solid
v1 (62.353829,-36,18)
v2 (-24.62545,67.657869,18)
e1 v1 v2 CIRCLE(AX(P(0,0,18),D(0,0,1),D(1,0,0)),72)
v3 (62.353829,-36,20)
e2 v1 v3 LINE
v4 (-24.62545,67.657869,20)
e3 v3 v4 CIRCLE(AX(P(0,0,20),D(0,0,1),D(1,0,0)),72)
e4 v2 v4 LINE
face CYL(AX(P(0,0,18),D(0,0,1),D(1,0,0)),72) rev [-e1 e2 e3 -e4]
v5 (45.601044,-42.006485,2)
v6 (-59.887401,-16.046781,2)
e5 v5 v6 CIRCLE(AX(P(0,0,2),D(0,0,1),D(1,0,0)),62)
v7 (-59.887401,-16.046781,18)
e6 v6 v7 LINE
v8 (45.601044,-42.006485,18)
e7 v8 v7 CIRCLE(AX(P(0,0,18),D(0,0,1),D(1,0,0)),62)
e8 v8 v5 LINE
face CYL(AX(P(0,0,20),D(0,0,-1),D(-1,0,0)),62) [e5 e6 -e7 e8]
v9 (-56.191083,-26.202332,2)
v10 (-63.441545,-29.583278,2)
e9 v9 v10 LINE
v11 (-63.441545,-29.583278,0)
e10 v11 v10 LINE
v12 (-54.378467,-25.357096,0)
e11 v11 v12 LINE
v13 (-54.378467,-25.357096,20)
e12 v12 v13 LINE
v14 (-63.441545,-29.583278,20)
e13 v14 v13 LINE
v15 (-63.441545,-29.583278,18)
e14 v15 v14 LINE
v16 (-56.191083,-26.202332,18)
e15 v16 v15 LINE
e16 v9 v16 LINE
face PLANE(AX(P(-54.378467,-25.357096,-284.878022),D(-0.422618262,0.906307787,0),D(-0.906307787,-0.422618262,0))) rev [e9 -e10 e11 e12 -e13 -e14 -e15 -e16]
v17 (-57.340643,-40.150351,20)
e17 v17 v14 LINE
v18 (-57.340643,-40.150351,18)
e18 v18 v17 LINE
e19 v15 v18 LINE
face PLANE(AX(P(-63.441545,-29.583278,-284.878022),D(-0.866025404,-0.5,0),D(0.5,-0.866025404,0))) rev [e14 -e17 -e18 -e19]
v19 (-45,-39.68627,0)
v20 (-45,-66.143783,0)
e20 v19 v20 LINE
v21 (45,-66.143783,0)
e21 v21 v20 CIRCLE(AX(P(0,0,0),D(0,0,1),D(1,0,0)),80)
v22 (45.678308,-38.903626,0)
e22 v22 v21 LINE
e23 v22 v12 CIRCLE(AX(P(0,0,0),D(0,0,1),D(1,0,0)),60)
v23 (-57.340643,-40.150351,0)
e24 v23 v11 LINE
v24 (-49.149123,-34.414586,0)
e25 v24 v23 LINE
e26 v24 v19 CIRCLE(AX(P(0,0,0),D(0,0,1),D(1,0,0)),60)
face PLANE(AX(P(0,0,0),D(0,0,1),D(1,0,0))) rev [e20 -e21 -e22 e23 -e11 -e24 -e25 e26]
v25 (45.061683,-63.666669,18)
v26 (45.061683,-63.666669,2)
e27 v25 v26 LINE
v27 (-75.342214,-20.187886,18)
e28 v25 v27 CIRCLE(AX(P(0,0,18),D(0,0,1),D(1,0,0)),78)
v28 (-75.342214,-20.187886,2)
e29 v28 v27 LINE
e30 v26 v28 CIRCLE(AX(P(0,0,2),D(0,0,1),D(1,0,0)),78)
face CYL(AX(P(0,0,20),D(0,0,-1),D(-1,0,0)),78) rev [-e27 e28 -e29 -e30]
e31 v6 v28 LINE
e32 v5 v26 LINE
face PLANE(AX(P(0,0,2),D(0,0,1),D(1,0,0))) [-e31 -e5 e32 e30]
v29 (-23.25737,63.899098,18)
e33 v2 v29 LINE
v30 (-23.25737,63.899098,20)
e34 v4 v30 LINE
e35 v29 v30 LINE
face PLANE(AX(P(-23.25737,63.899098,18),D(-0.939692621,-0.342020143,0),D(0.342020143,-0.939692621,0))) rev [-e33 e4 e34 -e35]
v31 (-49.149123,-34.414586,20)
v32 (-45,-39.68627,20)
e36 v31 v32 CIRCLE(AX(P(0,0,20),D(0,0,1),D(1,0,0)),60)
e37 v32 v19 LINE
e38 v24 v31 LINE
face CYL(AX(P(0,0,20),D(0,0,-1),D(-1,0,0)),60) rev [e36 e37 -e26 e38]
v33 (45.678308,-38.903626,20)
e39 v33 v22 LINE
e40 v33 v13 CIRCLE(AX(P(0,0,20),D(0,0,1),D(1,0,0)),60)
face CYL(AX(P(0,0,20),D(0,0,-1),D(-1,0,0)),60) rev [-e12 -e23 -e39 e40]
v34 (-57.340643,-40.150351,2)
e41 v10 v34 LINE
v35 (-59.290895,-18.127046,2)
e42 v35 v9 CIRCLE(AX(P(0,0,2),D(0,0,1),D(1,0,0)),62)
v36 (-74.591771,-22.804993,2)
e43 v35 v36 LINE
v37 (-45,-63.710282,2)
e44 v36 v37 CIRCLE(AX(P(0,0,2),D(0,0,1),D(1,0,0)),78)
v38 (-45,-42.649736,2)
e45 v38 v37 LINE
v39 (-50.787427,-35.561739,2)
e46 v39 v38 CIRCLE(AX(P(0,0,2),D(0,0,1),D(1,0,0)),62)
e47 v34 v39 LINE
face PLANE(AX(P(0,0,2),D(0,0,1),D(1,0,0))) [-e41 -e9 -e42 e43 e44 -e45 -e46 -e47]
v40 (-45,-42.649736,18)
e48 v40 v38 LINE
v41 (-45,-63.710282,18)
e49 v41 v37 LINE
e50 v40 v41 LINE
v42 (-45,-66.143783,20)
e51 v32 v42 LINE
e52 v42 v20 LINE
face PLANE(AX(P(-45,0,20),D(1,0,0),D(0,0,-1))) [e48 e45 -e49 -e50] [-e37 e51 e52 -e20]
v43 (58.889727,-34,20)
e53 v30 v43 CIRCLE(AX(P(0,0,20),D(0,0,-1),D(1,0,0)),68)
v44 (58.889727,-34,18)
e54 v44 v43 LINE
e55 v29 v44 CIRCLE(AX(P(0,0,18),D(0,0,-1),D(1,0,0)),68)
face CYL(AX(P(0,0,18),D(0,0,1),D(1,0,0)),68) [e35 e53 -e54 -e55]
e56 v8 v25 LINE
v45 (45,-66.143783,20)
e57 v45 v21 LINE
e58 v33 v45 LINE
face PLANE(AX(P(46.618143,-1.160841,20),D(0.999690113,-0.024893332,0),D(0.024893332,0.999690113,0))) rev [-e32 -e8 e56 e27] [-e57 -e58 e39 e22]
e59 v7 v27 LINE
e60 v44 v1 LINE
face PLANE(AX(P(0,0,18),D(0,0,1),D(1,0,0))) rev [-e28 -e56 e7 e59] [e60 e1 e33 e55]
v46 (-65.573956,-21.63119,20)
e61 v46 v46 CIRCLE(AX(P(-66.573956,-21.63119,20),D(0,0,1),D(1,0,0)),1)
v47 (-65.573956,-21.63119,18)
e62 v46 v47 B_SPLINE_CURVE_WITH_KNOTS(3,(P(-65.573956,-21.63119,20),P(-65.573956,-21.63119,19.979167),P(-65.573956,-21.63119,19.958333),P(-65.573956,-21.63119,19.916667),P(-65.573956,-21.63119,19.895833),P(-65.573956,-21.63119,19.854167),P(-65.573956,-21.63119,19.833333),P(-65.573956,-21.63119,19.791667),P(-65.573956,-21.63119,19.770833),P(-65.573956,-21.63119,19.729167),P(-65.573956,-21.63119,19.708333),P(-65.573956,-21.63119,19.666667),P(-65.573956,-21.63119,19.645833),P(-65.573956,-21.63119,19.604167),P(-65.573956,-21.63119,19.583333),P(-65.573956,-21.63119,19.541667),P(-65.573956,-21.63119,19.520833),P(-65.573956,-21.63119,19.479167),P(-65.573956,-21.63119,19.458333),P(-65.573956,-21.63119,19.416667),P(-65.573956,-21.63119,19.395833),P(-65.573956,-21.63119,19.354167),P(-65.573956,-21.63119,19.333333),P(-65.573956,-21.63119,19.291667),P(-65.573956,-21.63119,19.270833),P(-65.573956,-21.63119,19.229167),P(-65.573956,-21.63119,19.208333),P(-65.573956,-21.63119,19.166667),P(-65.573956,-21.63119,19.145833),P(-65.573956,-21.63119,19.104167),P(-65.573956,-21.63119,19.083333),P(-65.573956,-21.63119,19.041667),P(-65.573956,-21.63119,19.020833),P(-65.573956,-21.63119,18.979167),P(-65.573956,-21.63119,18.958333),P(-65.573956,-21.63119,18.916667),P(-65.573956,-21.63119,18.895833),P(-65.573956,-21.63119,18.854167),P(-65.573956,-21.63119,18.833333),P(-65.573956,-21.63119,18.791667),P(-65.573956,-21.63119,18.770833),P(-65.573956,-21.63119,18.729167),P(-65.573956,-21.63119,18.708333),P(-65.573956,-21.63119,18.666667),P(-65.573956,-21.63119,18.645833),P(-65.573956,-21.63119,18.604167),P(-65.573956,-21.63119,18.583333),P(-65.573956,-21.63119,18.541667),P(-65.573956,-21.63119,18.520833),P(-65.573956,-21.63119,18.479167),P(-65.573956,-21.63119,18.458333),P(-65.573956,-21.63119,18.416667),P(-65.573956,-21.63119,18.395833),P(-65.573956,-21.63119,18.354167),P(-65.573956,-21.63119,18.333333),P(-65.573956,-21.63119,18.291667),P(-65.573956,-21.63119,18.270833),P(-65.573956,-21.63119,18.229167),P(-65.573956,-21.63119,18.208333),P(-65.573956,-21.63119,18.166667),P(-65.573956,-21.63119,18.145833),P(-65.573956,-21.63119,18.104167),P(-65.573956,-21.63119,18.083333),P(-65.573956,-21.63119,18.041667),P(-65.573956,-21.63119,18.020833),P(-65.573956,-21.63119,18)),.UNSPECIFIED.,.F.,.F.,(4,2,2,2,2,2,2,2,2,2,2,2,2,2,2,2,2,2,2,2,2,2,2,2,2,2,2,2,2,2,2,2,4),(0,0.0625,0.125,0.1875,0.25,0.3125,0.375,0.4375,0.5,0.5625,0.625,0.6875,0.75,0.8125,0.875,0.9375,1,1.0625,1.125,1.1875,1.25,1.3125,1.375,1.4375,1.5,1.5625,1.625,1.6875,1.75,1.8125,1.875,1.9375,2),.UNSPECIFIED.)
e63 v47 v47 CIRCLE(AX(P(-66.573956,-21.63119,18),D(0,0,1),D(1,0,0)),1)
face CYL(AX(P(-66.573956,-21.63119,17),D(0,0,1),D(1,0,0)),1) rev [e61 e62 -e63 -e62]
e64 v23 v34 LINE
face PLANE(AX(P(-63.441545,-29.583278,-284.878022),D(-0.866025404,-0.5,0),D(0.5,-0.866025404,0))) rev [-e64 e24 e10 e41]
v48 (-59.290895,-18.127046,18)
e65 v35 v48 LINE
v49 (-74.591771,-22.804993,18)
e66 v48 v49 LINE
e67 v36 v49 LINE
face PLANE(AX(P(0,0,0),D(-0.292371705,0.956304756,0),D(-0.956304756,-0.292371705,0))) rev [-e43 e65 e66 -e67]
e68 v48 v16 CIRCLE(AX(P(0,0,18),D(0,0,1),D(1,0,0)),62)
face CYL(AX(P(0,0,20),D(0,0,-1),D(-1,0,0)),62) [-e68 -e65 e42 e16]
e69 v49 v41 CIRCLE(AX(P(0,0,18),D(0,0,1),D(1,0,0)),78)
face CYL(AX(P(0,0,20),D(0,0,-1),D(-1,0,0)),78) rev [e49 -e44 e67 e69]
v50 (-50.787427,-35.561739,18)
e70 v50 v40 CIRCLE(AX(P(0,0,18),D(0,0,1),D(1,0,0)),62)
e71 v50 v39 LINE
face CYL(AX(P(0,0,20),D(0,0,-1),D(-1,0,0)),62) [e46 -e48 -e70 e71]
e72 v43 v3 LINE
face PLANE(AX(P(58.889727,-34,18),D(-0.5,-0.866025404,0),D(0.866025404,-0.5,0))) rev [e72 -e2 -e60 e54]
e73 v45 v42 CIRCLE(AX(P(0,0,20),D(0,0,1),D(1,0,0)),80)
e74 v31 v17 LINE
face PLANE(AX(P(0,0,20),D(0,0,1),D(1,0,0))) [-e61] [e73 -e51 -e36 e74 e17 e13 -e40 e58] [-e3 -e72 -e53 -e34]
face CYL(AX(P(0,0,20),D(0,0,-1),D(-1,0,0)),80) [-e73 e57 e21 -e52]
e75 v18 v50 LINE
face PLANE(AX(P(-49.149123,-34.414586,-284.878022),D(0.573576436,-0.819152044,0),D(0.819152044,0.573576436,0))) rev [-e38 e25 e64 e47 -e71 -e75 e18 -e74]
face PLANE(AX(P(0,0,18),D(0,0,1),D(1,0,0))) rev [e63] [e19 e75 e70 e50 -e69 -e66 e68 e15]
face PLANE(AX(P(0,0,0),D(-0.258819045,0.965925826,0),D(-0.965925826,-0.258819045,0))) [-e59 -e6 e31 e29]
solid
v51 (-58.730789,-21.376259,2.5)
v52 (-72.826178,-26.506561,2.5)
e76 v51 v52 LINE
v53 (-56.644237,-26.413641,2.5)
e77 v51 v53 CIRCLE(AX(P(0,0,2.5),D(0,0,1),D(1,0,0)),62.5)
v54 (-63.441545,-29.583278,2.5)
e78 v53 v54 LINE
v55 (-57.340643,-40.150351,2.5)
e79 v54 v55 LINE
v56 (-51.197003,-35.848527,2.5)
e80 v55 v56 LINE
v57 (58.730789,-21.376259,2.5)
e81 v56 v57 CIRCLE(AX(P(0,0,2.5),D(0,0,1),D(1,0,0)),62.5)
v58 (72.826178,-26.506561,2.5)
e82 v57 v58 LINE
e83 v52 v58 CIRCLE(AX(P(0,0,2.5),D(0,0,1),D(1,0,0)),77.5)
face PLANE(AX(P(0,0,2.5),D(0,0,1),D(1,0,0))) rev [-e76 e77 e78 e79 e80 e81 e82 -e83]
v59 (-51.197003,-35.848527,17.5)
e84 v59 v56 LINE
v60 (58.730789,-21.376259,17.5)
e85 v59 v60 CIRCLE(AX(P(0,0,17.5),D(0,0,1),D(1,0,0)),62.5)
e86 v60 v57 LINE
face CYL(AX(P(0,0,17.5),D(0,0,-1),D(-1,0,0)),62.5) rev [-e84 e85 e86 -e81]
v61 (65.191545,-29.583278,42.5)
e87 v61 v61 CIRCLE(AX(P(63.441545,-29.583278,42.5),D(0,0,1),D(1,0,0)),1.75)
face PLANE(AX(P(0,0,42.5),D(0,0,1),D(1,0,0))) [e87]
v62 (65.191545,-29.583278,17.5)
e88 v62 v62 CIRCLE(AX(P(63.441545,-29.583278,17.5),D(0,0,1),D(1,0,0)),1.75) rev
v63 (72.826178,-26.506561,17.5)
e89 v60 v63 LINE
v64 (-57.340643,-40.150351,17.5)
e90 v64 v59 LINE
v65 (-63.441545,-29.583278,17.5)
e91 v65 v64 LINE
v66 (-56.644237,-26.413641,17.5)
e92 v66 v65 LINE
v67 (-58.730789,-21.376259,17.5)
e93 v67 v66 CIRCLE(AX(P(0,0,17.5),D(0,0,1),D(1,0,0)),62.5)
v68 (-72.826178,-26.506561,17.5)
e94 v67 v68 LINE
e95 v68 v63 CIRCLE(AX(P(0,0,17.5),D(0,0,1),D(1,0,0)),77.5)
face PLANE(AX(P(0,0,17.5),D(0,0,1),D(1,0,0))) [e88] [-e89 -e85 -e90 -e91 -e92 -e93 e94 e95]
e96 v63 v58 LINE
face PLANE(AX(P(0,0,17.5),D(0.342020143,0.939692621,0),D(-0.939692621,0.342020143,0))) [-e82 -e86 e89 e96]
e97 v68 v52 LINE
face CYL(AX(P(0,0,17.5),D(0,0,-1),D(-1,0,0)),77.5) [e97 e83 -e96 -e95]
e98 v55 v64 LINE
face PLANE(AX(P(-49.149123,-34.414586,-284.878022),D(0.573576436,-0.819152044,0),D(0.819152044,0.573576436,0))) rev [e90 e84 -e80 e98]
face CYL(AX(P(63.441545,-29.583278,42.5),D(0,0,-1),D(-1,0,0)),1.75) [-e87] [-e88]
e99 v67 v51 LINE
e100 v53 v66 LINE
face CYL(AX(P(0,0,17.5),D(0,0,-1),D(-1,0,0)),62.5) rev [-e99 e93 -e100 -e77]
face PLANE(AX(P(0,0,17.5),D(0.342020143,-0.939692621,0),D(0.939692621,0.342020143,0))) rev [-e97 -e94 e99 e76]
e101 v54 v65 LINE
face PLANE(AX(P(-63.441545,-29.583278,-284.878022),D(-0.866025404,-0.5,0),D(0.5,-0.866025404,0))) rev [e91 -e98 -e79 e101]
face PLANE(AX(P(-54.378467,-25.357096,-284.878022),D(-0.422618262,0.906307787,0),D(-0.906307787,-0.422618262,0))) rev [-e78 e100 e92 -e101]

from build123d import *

# Parameters (mm, degrees)
BOSS_EXTRUDE7_DEPTH  = 20
SHELL3_T             = -2
CUT_EXTRUDE4_DEPTH   = 2
SKETCH17_R           = 1
CUT_EXTRUDE5_DEPTH   = 3
BOSS_EXTRUDE11_START = -20
BOSS_EXTRUDE11_DEPTH = 20
BOSS_EXTRUDE12_START = 2.5
BOSS_EXTRUDE12_DEPTH = 15
CUT_EXTRUDE6_START   = -20
CUT_EXTRUDE6_DEPTH   = 20
BOSS_EXTRUDE14_START = 2.5
BOSS_EXTRUDE14_DEPTH = 40


# Read off the part's stored shape, not the designer's step: Cut-Extrude6
with BuildPart() as part:
    # Sketch12 → Boss-Extrude7 (new body)
    with BuildSketch(Plane.XY):
        with BuildLine():
            Line((-45, -66.143782777), (-45, -39.686269666))
            ThreePointArc((-45, -39.686269666), (-0.517840004, 59.997765306), (45.678308464, -38.903626256))
            Line((45.678308464, -38.903626256), (45, -66.143782777))
            ThreePointArc((45, -66.143782777), (0, 80), (-45, -66.143782777))
        make_face()
    extrude(amount=BOSS_EXTRUDE7_DEPTH)

    # Shell3
    shell3_openings = [part.faces().sort_by_distance(p)[0] for p in [
        (45.339154232, -52.523704516, 10),
        (-45, -52.915026221, 10),
    ]]
    offset(amount=SHELL3_T, openings=shell3_openings, kind=Kind.INTERSECTION)

    # Sketch15 → Cut-Extrude4 (cut)
    with BuildSketch(Plane.XY.offset(20)):
        with BuildLine():
            Line((58.889727457, -34), (62.353829072, -36))
            ThreePointArc((62.353829072, -36), (55.155199905, 46.280707897), (-24.625450319, 67.657868697))
            Line((-24.625450319, 67.657868697), (-23.257369746, 63.899098213))
            ThreePointArc((-23.257369746, 63.899098213), (52.091022132, 43.709557459), (58.889727457, -34))
        make_face()
    extrude(amount=-CUT_EXTRUDE4_DEPTH, mode=Mode.SUBTRACT)

    # Sketch17 → Cut-Extrude5 (cut)
    with BuildSketch(Plane.XY.offset(20)):
        with Locations((-66.573956141, -21.631189606)):
            Circle(SKETCH17_R)
    extrude(amount=-CUT_EXTRUDE5_DEPTH, mode=Mode.SUBTRACT)

    # Sketch17<4> → Boss-Extrude11 (add)
    with BuildSketch(Plane.XY.offset(20).offset(BOSS_EXTRUDE11_START)):
        with BuildLine():
            Line((-76.504380477, -23.389736378), (-57.378285358, -17.542302283))
            ThreePointArc((-57.378285358, -17.542302283), (-57.675701756, -16.538241349), (-57.955549577, -15.529142706))
            Line((-57.955549577, -15.529142706), (-77.274066103, -20.705523608))
            ThreePointArc((-77.274066103, -20.705523608), (-76.900935675, -22.050988465), (-76.504380477, -23.389736378))
        make_face()
    extrude(amount=BOSS_EXTRUDE11_DEPTH)


with BuildPart() as body_2:
    # Sketch19 → Boss-Extrude12 (new body)
    with BuildSketch(Plane.XY.offset(BOSS_EXTRUDE12_START)):
        with BuildLine():
            Line((-58.730788799, -21.376258958), (-72.826178111, -26.506561108))
            ThreePointArc((-72.826178111, -26.506561108), (0, -77.5), (72.826178111, -26.506561108))
            Line((72.826178111, -26.506561108), (58.730788799, -21.376258958))
            ThreePointArc((58.730788799, -21.376258958), (0, -62.5), (-58.730788799, -21.376258958))
        make_face()
    extrude(amount=BOSS_EXTRUDE12_DEPTH)


with BuildPart() as cut_extrude6_tool:
    # Cut-Extrude6 outline → Cut-Extrude6 (new body)
    with BuildSketch(Plane(origin=(0, 0, 0), x_dir=(-1, 0, 0), z_dir=(0, 0, -1)).offset(CUT_EXTRUDE6_START)):
        with BuildLine():
            Line((51.197002768, -35.848527272), (57.3406431, -40.150350545))
            Line((57.3406431, -40.150350545), (63.441545093, -29.583278322))
            Line((63.441545093, -29.583278322), (56.64423669, -26.413641359))
            Line((56.64423669, -26.413641359), (54.378467222, -25.357095704))
            ThreePointArc((54.378467222, -25.357095704), (51.961524227, -30), (49.149122657, -34.414586181))
            Line((49.149122657, -34.414586181), (51.197002768, -35.848527272))
        make_face()
    extrude(amount=CUT_EXTRUDE6_DEPTH)


with BuildPart() as part_1:
    add(part.part)

    # Cut-Extrude6: cut by cut_extrude6_tool
    add(cut_extrude6_tool.part, mode=Mode.SUBTRACT)


with BuildPart() as body_2_1:
    add(body_2.part)

    # Cut-Extrude6: cut by cut_extrude6_tool
    add(cut_extrude6_tool.part, mode=Mode.SUBTRACT)

    # Sketch19<5> → Boss-Extrude14 (add)
    with BuildSketch(Plane.XY.offset(BOSS_EXTRUDE14_START)):
        with BuildLine():
            ThreePointArc((65.191545093, -29.583278322), (63.820314417, -27.874760309), (61.855506465, -28.843696364))
            Line((61.855506465, -28.843696364), (65.02758372, -30.32286028))
            ThreePointArc((65.02758372, -30.32286028), (65.150063105, -29.962047646), (65.191545093, -29.583278322))
        make_face()
        with BuildLine():
            Line((65.02758372, -30.32286028), (61.855506465, -28.843696364))
            ThreePointArc((61.855506465, -28.843696364), (62.701963135, -31.169316949), (65.02758372, -30.32286028))
        make_face()
    extrude(amount=BOSS_EXTRUDE14_DEPTH)


solid = Compound([part_1.part, body_2_1.part])
